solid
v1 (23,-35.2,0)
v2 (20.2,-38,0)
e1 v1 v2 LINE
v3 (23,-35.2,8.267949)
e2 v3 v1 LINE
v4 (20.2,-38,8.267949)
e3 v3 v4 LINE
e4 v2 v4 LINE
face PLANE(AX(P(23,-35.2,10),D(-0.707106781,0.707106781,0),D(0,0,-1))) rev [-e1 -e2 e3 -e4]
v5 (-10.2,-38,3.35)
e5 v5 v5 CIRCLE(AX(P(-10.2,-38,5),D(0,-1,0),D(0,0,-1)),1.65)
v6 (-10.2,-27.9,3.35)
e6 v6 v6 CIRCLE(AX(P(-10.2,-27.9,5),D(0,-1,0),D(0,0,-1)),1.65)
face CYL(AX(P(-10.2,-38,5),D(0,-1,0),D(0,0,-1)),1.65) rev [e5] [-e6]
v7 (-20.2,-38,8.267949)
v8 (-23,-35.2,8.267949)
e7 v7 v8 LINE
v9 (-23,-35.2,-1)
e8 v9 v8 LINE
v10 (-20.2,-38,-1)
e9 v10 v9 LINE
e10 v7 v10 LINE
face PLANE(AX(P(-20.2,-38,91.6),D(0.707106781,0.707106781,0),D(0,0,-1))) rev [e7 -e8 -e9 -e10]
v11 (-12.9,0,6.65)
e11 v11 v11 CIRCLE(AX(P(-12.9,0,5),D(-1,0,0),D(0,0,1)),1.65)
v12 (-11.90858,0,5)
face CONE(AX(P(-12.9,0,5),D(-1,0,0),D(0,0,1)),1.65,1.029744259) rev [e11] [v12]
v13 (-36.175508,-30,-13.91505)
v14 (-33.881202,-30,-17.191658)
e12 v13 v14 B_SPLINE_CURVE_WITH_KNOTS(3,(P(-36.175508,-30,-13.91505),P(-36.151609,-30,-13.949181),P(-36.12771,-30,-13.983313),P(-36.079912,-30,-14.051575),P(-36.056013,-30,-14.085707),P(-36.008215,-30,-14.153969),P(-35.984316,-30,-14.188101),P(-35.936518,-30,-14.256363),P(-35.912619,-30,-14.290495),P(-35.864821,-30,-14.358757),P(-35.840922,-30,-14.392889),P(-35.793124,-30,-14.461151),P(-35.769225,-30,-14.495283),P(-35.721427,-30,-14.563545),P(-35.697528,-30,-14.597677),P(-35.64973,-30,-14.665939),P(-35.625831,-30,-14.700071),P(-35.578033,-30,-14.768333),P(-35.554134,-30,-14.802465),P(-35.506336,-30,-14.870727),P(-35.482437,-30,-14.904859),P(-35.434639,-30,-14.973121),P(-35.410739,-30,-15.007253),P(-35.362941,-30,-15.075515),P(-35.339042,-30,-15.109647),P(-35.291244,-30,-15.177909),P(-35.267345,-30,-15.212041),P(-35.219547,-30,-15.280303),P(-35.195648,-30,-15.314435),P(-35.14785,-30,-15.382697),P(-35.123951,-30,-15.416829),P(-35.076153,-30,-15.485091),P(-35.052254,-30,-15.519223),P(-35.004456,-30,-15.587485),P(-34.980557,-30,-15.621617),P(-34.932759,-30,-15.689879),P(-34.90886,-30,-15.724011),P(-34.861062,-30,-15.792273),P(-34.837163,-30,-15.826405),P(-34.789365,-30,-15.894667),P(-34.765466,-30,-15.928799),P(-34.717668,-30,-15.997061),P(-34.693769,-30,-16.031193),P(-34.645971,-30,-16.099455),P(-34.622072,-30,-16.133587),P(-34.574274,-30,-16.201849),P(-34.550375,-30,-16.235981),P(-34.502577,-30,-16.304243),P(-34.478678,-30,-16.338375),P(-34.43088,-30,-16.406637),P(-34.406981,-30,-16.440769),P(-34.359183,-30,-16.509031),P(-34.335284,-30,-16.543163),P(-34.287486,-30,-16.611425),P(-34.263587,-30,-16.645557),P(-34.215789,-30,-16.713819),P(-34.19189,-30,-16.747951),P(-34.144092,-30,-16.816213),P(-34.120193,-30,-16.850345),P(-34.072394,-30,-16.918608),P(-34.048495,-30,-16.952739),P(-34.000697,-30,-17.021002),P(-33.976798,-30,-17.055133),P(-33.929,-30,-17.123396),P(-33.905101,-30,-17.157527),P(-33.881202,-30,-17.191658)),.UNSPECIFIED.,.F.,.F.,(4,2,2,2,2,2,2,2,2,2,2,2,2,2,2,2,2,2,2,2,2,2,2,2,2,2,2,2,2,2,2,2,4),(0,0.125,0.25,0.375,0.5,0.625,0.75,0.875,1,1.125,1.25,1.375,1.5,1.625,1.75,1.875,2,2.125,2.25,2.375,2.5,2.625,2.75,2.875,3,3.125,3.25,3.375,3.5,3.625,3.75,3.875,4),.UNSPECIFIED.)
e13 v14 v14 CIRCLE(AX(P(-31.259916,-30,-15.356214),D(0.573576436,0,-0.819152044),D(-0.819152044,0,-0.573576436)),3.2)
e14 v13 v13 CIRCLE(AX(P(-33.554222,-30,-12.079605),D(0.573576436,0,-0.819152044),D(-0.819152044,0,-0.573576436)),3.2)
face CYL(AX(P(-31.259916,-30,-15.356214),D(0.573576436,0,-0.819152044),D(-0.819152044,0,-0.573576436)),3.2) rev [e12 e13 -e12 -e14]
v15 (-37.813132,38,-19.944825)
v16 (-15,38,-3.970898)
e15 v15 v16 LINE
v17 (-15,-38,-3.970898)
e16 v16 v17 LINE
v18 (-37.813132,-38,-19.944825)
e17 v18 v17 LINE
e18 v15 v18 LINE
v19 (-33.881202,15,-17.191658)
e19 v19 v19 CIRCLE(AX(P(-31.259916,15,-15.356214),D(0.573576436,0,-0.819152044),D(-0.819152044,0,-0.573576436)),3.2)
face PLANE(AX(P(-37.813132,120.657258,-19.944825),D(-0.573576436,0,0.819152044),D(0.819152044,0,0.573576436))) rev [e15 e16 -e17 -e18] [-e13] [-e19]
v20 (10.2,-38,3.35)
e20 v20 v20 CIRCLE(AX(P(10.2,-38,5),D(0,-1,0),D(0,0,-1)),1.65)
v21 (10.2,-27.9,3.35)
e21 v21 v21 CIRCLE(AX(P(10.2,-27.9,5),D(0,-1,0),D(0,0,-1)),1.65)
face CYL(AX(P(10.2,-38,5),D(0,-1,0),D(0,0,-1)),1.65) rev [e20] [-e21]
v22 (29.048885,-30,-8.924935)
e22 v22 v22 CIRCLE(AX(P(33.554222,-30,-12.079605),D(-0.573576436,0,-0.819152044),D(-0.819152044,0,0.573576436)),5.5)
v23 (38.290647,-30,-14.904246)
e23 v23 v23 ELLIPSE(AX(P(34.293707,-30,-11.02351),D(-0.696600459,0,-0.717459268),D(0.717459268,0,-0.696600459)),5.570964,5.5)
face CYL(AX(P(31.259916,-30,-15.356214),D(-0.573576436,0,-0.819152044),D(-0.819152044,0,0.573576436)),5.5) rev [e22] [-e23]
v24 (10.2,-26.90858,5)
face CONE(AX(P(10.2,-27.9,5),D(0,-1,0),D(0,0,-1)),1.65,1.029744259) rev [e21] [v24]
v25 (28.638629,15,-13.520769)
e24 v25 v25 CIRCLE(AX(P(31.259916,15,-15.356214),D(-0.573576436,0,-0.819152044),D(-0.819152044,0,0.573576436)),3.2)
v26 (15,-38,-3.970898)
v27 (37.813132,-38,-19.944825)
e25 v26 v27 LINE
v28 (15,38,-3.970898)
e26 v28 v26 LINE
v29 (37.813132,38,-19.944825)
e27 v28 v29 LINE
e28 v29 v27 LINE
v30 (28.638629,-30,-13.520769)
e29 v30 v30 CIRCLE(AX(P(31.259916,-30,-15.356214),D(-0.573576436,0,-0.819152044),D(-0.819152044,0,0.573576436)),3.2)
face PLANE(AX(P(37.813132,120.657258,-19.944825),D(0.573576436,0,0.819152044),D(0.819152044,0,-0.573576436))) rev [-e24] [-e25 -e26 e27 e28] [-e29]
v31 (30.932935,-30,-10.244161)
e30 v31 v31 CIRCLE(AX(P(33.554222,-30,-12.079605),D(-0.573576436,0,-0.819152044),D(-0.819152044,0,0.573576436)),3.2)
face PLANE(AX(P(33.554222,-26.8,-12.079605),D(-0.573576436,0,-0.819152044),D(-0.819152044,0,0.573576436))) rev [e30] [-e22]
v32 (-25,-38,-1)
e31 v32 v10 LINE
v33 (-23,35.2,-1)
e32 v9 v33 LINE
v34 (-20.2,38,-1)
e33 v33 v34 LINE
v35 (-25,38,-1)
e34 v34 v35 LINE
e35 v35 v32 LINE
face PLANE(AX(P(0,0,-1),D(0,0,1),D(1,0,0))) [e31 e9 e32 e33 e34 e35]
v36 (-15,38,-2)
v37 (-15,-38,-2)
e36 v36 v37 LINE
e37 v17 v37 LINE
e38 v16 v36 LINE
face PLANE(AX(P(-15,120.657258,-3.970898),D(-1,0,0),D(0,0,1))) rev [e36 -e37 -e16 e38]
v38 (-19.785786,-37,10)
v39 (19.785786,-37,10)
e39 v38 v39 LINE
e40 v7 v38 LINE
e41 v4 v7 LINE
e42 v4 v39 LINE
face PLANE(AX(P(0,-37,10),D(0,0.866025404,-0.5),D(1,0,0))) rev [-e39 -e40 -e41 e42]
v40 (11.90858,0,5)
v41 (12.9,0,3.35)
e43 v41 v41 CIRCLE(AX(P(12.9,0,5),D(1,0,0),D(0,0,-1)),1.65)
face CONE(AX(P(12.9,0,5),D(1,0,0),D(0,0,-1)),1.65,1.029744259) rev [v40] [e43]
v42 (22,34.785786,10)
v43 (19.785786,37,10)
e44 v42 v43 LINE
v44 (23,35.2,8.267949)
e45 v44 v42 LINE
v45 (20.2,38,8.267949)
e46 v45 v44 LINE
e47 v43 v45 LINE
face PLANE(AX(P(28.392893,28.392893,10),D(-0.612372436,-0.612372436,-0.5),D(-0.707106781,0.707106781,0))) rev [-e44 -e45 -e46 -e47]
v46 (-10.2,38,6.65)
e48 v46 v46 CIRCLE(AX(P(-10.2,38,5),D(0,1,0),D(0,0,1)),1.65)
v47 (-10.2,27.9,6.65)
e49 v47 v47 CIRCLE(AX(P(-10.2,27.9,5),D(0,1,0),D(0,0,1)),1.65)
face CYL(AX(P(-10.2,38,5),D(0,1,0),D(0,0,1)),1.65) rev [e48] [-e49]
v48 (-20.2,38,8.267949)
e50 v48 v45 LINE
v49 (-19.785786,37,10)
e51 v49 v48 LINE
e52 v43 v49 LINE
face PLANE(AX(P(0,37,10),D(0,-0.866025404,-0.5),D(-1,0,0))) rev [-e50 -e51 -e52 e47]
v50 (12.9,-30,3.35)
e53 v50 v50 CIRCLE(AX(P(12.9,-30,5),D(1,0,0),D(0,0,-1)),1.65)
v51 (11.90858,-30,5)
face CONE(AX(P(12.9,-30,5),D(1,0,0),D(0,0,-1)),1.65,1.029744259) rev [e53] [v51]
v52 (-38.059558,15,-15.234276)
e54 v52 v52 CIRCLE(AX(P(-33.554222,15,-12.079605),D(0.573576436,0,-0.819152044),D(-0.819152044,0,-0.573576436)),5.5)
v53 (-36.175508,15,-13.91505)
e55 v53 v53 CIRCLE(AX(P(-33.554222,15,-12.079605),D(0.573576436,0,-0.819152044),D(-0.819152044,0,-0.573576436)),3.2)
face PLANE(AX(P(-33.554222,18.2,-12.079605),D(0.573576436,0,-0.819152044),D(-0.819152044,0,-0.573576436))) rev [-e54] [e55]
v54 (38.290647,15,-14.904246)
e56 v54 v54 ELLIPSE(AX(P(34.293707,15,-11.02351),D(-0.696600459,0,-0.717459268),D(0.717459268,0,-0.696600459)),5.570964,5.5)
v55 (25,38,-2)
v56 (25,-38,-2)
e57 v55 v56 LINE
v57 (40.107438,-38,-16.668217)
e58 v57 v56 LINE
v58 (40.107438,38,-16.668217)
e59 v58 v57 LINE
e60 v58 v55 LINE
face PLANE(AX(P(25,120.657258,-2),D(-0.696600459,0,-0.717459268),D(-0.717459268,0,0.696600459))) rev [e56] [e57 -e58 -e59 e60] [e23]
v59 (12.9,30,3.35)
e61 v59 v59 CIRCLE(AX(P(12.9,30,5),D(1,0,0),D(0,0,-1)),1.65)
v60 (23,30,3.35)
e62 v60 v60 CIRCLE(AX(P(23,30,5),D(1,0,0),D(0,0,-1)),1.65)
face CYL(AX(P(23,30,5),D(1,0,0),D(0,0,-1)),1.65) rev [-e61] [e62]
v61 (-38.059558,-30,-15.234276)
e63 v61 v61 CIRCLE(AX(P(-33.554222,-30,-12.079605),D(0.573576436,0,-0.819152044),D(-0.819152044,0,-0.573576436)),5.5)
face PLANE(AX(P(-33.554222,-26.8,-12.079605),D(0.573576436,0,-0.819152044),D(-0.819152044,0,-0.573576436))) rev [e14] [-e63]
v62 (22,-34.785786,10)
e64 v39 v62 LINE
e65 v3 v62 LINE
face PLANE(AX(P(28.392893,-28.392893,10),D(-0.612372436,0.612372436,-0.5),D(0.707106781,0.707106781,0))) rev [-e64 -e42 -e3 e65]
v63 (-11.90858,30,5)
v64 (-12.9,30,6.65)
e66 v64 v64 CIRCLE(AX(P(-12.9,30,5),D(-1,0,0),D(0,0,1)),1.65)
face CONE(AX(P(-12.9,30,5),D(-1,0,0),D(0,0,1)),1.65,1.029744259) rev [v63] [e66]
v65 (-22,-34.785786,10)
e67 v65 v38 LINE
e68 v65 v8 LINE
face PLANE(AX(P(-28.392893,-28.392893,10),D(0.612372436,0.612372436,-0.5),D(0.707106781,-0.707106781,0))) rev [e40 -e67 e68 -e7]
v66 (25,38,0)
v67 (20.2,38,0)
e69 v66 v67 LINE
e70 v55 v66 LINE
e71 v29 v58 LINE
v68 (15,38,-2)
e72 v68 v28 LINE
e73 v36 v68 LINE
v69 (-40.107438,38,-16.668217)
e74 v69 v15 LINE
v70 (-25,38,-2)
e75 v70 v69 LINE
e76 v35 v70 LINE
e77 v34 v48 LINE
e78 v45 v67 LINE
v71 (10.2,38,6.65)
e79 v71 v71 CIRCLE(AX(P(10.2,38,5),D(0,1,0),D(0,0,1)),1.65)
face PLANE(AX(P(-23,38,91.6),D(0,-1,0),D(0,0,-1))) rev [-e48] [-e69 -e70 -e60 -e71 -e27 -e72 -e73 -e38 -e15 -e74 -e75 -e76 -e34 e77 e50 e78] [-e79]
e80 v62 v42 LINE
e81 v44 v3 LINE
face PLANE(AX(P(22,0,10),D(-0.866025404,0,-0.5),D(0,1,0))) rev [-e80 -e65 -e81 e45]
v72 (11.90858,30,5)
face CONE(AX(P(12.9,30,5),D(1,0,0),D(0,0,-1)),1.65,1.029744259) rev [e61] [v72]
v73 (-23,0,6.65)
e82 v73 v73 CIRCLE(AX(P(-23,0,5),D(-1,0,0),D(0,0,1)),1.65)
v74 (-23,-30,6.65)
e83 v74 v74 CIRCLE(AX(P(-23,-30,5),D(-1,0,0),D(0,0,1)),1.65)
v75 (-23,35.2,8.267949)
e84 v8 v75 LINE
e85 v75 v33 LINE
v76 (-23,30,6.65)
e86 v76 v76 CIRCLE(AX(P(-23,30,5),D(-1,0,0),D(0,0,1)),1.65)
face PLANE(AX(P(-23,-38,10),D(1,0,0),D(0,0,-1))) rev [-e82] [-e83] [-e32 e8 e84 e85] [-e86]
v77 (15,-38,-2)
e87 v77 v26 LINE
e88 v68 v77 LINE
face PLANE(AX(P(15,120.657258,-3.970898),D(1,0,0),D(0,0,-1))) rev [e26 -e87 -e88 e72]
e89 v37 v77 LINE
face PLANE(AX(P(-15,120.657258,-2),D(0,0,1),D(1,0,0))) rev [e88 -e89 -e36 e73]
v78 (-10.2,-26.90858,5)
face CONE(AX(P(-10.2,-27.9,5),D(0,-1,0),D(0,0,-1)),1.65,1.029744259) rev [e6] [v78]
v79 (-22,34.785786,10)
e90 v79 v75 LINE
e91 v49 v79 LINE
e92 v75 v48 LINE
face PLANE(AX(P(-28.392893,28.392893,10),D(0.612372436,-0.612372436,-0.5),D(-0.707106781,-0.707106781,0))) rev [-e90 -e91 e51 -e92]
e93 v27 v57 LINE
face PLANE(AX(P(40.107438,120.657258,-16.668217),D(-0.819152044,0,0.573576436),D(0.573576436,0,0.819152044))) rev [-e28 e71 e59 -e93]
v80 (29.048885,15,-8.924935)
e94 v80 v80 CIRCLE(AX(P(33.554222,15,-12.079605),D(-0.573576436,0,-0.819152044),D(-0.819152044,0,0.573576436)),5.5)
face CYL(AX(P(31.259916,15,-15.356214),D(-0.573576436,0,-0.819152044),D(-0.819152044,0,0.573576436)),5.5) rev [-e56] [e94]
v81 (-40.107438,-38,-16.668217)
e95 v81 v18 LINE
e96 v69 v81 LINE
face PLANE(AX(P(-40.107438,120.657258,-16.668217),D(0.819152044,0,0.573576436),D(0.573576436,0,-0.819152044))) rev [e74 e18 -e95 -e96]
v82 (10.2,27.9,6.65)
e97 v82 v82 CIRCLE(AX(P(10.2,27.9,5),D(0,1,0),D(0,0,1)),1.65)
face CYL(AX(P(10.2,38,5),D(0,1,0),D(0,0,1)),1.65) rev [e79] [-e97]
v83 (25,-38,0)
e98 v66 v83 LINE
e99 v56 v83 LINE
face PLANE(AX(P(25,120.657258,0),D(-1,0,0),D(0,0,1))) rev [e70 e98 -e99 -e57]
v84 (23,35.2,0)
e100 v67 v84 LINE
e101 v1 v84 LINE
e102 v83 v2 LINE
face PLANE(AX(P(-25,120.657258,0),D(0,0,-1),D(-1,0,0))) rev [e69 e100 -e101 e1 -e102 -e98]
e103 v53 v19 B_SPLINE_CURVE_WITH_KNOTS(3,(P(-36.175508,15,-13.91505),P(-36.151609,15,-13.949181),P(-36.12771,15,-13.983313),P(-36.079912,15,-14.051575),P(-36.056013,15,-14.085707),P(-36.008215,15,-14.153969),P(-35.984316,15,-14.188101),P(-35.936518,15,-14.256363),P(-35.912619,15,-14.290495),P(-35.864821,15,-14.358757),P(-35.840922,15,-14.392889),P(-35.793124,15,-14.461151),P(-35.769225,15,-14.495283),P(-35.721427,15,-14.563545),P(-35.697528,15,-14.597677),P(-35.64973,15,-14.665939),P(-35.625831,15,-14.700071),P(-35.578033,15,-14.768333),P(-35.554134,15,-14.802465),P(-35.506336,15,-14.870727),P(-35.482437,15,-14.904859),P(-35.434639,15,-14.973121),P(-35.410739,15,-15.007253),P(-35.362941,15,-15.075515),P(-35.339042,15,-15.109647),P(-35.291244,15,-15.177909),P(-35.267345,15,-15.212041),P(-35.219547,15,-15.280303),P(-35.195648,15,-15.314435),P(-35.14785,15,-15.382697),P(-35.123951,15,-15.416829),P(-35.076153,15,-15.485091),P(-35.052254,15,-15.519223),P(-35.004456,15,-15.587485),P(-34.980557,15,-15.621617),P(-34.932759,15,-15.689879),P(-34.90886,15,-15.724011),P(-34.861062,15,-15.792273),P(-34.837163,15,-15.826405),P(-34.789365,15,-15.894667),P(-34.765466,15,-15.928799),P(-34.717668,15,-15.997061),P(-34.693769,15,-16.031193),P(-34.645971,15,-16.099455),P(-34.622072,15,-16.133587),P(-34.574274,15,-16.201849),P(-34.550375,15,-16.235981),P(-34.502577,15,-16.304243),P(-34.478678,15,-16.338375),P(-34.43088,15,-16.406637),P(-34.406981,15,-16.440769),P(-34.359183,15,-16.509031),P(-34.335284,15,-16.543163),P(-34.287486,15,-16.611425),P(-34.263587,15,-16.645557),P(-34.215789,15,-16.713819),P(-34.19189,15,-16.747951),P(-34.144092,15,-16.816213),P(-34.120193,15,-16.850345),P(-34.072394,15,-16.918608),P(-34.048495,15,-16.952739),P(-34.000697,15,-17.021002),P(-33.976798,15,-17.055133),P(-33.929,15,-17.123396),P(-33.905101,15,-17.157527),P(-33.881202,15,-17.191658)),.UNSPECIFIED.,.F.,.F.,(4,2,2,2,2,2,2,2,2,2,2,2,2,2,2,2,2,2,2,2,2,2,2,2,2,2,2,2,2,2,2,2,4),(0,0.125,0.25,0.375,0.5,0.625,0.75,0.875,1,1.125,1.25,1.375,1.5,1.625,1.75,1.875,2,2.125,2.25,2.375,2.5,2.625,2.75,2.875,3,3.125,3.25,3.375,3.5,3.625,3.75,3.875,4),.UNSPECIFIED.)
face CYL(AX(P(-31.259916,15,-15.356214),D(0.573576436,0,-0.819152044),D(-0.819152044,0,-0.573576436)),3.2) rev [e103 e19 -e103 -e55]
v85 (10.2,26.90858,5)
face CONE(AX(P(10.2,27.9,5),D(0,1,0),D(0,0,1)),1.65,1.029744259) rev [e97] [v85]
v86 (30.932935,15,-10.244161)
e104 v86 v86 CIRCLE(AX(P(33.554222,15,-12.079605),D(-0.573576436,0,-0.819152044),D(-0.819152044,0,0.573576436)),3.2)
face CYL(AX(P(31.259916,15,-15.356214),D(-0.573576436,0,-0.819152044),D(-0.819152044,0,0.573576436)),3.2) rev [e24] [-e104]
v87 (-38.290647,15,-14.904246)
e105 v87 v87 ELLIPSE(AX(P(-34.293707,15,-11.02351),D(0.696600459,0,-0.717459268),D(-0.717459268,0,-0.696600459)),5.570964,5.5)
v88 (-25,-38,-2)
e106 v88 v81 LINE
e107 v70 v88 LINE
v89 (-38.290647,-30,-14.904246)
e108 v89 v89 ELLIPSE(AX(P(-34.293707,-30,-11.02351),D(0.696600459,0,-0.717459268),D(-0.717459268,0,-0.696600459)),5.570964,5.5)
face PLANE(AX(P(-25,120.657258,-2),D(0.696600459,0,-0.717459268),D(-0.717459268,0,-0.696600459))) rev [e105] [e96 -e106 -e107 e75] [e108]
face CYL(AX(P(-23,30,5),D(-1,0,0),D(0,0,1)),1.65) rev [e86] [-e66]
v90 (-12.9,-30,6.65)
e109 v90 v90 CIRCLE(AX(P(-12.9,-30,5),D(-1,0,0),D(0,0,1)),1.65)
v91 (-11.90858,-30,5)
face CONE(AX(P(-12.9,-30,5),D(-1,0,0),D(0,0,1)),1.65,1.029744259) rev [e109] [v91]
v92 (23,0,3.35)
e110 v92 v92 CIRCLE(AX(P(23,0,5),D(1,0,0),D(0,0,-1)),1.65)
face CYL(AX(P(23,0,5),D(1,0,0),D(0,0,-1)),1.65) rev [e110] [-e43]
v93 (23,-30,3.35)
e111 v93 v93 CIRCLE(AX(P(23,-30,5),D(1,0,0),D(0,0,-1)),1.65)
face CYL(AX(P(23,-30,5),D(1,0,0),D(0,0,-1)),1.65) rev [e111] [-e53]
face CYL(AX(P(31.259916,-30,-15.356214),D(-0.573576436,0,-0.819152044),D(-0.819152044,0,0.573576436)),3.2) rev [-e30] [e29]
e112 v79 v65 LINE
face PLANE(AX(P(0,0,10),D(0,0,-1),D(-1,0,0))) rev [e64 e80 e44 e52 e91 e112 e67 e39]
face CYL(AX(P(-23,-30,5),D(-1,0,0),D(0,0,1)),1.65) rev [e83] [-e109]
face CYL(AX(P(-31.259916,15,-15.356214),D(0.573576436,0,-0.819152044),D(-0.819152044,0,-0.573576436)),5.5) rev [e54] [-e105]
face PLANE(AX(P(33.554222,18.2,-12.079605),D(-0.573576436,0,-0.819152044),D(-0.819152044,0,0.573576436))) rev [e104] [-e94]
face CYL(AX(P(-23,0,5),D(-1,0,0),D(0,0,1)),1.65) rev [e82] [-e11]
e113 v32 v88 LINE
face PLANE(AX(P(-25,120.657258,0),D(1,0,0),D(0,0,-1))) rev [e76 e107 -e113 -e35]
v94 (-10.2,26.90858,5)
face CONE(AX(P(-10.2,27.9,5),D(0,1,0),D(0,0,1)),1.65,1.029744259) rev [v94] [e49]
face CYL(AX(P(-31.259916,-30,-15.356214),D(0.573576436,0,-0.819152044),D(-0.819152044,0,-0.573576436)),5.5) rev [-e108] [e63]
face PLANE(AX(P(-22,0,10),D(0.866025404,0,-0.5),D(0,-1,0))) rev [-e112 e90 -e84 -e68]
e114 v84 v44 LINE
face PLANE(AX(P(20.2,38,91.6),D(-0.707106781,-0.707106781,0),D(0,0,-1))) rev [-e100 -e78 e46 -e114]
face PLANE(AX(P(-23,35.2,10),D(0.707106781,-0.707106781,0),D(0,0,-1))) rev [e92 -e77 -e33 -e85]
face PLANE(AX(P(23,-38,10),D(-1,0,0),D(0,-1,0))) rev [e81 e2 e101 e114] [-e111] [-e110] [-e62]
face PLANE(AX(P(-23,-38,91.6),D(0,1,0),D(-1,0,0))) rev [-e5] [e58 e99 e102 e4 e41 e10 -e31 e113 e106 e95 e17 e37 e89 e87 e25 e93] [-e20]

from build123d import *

# Parameters (mm, degrees)
BOSS_EXTRUDE1_DEPTH             = 38
BOSS_EXTRUDE1_DEPTH_BACK        = 38
SKETCH2_W                       = 46
SKETCH2_H                       = 76
BOSS_EXTRUDE2_DEPTH             = 10
ADVANCEDHOLE1_START             = 9.350877343
ADVANCEDHOLE1_OUTLINE_R         = 5.5
ADVANCEDHOLE1_DEPTH             = 2.175616923
ADVANCEDHOLE1_START_2           = 5.350877343
ADVANCEDHOLE1_2_OUTLINE_R       = 3.2
ADVANCEDHOLE1_2_DEPTH           = 4
ADVANCEDHOLE2_START             = -11.526494266
ADVANCEDHOLE2_OUTLINE_R         = 5.5
ADVANCEDHOLE2_DEPTH             = 2.175616923
ADVANCEDHOLE2_START_2           = -9.350877343
ADVANCEDHOLE2_2_OUTLINE_R       = 3.2
ADVANCEDHOLE2_2_DEPTH           = 4
SKETCH11_W                      = 2
SKETCH11_H                      = 76
CUT_EXTRUDE1_DEPTH              = 1
M4_TAPPED_HOLE1_D               = 3.3
M4_TAPPED_HOLE1_DEPTH           = 10.1
M4_TAPPED_HOLE1_TIP             = 0.991420021
M4_TAPPED_HOLE1_ON_FACE_2_D     = 3.3
M4_TAPPED_HOLE1_ON_FACE_2_DEPTH = 10.1
M4_TAPPED_HOLE1_ON_FACE_2_TIP   = 0.991420021
M4_TAPPED_HOLE1_ON_FACE_3_D     = 3.3
M4_TAPPED_HOLE1_ON_FACE_3_DEPTH = 10.1
M4_TAPPED_HOLE1_ON_FACE_3_TIP   = 0.991420021
M4_TAPPED_HOLE1_ON_FACE_4_D     = 3.3
M4_TAPPED_HOLE1_ON_FACE_4_DEPTH = 10.1
M4_TAPPED_HOLE1_ON_FACE_4_TIP   = 0.991420021
CHAMFER1_SIZE                   = 2.8
CHAMFER2_SIZE                   = 1
CHAMFER2_SIZE2                  = 1.732050808


# Read off the part's stored shape, not the designer's step: AdvancedHole1, AdvancedHole2
with BuildPart() as part:
    # Sketch1 → Boss-Extrude1 (new, two sides: drawn at the far end of the back side and taken through both)
    with BuildSketch(Plane(origin=(0, 0, 0), x_dir=(1, 0, 0), z_dir=(0, 1, 0)).offset(-BOSS_EXTRUDE1_DEPTH_BACK)):
        Polygon((-25, 2), (-40.107437881, 16.6682169), (-37.813132135, 19.944825077), (-15, 3.970897986), (-15, 2), (15, 2), (15, 3.970897986), (37.813132135, 19.944825077), (40.107437881, 16.6682169), (25, 2), (25, 0), (-25, 0), align=None)
    extrude(amount=BOSS_EXTRUDE1_DEPTH + BOSS_EXTRUDE1_DEPTH_BACK)

    # Sketch2 → Boss-Extrude2 (add)
    with BuildSketch(Plane.XY):
        Rectangle(SKETCH2_W, SKETCH2_H)
    extrude(amount=BOSS_EXTRUDE2_DEPTH)

    # AdvancedHole1 outline → AdvancedHole1 (cut)
    with BuildSketch(Plane(origin=(0, 0, 0), x_dir=(0.819152044288991, 0, -0.5735764363510472), z_dir=(0.5735764363510472, 0, 0.8191520442889911)).offset(ADVANCEDHOLE1_START)):
        with Locations((34.414586181, -30)):
            Circle(ADVANCEDHOLE1_OUTLINE_R)
        with Locations((34.414586181, 15)):
            Circle(ADVANCEDHOLE1_OUTLINE_R)
    extrude(amount=ADVANCEDHOLE1_DEPTH, mode=Mode.SUBTRACT)

    # AdvancedHole1 2 outline → AdvancedHole1 2 (cut)
    with BuildSketch(Plane(origin=(0, 0, 0), x_dir=(0.819152044288991, 0, -0.5735764363510472), z_dir=(0.5735764363510472, 0, 0.8191520442889911)).offset(ADVANCEDHOLE1_START_2)):
        with Locations((34.414586181, -30)):
            Circle(ADVANCEDHOLE1_2_OUTLINE_R)
        with Locations((34.414586181, 15)):
            Circle(ADVANCEDHOLE1_2_OUTLINE_R)
    extrude(amount=ADVANCEDHOLE1_2_DEPTH, mode=Mode.SUBTRACT)

    # AdvancedHole2 outline → AdvancedHole2 (cut)
    with BuildSketch(Plane(origin=(0, 0, 0), x_dir=(0.819152044288991, 0, 0.5735764363510472), z_dir=(0.5735764363510472, 0, -0.8191520442889911)).offset(ADVANCEDHOLE2_START)):
        with Locations((-34.414586181, 30)):
            Circle(ADVANCEDHOLE2_OUTLINE_R)
        with Locations((-34.414586181, -15)):
            Circle(ADVANCEDHOLE2_OUTLINE_R)
    extrude(amount=ADVANCEDHOLE2_DEPTH, mode=Mode.SUBTRACT)

    # AdvancedHole2 2 outline → AdvancedHole2 2 (cut)
    with BuildSketch(Plane(origin=(0, 0, 0), x_dir=(0.819152044288991, 0, 0.5735764363510472), z_dir=(0.5735764363510472, 0, -0.8191520442889911)).offset(ADVANCEDHOLE2_START_2)):
        with Locations((-34.414586181, 30)):
            Circle(ADVANCEDHOLE2_2_OUTLINE_R)
        with Locations((-34.414586181, -15)):
            Circle(ADVANCEDHOLE2_2_OUTLINE_R)
    extrude(amount=ADVANCEDHOLE2_2_DEPTH, mode=Mode.SUBTRACT)

    # Sketch11 → Cut-Extrude1 (cut)
    with BuildSketch(Plane.XY):
        with Locations((-24, 0)):
            Rectangle(SKETCH11_W, SKETCH11_H)
    extrude(amount=-CUT_EXTRUDE1_DEPTH, mode=Mode.SUBTRACT)

    # M4 Tapped Hole1
    with Locations(Plane(origin=(23, 30, 5), x_dir=(0, 1, 0), z_dir=(1, 0, 0))):
        with Locations((0, 0), (-60, 0), (-30, 0)):
            Hole(M4_TAPPED_HOLE1_D / 2, depth=M4_TAPPED_HOLE1_DEPTH)
            with Locations((0, 0, -(M4_TAPPED_HOLE1_DEPTH + M4_TAPPED_HOLE1_TIP / 2))):  # 118° drill point
                Cone(0, M4_TAPPED_HOLE1_D / 2, M4_TAPPED_HOLE1_TIP, mode=Mode.SUBTRACT)

    # M4 Tapped Hole1 on face 2
    with Locations(Plane(origin=(-23, 30, 5), x_dir=(0, 0, -1), z_dir=(-1, 0, 0))):
        with Locations((0, 0), (0, 60), (0, 30)):
            Hole(M4_TAPPED_HOLE1_ON_FACE_2_D / 2, depth=M4_TAPPED_HOLE1_ON_FACE_2_DEPTH)
            with Locations((0, 0, -(M4_TAPPED_HOLE1_ON_FACE_2_DEPTH + M4_TAPPED_HOLE1_ON_FACE_2_TIP / 2))):  # 118° drill point
                Cone(0, M4_TAPPED_HOLE1_ON_FACE_2_D / 2, M4_TAPPED_HOLE1_ON_FACE_2_TIP, mode=Mode.SUBTRACT)

    # M4 Tapped Hole1 on face 3
    with Locations(Plane(origin=(10.2, 38, 5), x_dir=(0, 0, 1), z_dir=(0, 1, 0))):
        with Locations((0, 0), (0, -20.4)):
            Hole(M4_TAPPED_HOLE1_ON_FACE_3_D / 2, depth=M4_TAPPED_HOLE1_ON_FACE_3_DEPTH)
            with Locations((0, 0, -(M4_TAPPED_HOLE1_ON_FACE_3_DEPTH + M4_TAPPED_HOLE1_ON_FACE_3_TIP / 2))):  # 118° drill point
                Cone(0, M4_TAPPED_HOLE1_ON_FACE_3_D / 2, M4_TAPPED_HOLE1_ON_FACE_3_TIP, mode=Mode.SUBTRACT)

    # M4 Tapped Hole1 on face 4
    with Locations(Plane(origin=(-10.2, -38, 5), x_dir=(0, 0, -1), z_dir=(0, -1, 0))):
        with Locations((0, 0), (0, 20.4)):
            Hole(M4_TAPPED_HOLE1_ON_FACE_4_D / 2, depth=M4_TAPPED_HOLE1_ON_FACE_4_DEPTH)
            with Locations((0, 0, -(M4_TAPPED_HOLE1_ON_FACE_4_DEPTH + M4_TAPPED_HOLE1_ON_FACE_4_TIP / 2))):  # 118° drill point
                Cone(0, M4_TAPPED_HOLE1_ON_FACE_4_D / 2, M4_TAPPED_HOLE1_ON_FACE_4_TIP, mode=Mode.SUBTRACT)

    # Chamfer1
    chamfer1_edges = [part.edges().sort_by_distance(p)[0] for p in [
        (23, -38, 5),
        (23, 38, 5),
        (-23, 38, 4.5),
        (-23, -38, 4.5),
    ]]
    chamfer(chamfer1_edges, length=CHAMFER1_SIZE)

    # Chamfer2
    chamfer2_edges = [part.edges().sort_by_distance(p)[0] for p in [
        (23, 0, 10),
        (0, -38, 10),
        (0, 38, 10),
        (-23, 0, 10),
        (21.6, 36.6, 10),
        (-21.6, 36.6, 10),
        (-21.6, -36.6, 10),
        (21.6, -36.6, 10),
    ]]
    chamfer2_side = [part.faces().sort_by_distance(p)[0] for p in [
        (0, 0, 10),
    ]]
    chamfer(chamfer2_edges, length=CHAMFER2_SIZE, length2=CHAMFER2_SIZE2, reference=chamfer2_side[0])


solid = part.part
